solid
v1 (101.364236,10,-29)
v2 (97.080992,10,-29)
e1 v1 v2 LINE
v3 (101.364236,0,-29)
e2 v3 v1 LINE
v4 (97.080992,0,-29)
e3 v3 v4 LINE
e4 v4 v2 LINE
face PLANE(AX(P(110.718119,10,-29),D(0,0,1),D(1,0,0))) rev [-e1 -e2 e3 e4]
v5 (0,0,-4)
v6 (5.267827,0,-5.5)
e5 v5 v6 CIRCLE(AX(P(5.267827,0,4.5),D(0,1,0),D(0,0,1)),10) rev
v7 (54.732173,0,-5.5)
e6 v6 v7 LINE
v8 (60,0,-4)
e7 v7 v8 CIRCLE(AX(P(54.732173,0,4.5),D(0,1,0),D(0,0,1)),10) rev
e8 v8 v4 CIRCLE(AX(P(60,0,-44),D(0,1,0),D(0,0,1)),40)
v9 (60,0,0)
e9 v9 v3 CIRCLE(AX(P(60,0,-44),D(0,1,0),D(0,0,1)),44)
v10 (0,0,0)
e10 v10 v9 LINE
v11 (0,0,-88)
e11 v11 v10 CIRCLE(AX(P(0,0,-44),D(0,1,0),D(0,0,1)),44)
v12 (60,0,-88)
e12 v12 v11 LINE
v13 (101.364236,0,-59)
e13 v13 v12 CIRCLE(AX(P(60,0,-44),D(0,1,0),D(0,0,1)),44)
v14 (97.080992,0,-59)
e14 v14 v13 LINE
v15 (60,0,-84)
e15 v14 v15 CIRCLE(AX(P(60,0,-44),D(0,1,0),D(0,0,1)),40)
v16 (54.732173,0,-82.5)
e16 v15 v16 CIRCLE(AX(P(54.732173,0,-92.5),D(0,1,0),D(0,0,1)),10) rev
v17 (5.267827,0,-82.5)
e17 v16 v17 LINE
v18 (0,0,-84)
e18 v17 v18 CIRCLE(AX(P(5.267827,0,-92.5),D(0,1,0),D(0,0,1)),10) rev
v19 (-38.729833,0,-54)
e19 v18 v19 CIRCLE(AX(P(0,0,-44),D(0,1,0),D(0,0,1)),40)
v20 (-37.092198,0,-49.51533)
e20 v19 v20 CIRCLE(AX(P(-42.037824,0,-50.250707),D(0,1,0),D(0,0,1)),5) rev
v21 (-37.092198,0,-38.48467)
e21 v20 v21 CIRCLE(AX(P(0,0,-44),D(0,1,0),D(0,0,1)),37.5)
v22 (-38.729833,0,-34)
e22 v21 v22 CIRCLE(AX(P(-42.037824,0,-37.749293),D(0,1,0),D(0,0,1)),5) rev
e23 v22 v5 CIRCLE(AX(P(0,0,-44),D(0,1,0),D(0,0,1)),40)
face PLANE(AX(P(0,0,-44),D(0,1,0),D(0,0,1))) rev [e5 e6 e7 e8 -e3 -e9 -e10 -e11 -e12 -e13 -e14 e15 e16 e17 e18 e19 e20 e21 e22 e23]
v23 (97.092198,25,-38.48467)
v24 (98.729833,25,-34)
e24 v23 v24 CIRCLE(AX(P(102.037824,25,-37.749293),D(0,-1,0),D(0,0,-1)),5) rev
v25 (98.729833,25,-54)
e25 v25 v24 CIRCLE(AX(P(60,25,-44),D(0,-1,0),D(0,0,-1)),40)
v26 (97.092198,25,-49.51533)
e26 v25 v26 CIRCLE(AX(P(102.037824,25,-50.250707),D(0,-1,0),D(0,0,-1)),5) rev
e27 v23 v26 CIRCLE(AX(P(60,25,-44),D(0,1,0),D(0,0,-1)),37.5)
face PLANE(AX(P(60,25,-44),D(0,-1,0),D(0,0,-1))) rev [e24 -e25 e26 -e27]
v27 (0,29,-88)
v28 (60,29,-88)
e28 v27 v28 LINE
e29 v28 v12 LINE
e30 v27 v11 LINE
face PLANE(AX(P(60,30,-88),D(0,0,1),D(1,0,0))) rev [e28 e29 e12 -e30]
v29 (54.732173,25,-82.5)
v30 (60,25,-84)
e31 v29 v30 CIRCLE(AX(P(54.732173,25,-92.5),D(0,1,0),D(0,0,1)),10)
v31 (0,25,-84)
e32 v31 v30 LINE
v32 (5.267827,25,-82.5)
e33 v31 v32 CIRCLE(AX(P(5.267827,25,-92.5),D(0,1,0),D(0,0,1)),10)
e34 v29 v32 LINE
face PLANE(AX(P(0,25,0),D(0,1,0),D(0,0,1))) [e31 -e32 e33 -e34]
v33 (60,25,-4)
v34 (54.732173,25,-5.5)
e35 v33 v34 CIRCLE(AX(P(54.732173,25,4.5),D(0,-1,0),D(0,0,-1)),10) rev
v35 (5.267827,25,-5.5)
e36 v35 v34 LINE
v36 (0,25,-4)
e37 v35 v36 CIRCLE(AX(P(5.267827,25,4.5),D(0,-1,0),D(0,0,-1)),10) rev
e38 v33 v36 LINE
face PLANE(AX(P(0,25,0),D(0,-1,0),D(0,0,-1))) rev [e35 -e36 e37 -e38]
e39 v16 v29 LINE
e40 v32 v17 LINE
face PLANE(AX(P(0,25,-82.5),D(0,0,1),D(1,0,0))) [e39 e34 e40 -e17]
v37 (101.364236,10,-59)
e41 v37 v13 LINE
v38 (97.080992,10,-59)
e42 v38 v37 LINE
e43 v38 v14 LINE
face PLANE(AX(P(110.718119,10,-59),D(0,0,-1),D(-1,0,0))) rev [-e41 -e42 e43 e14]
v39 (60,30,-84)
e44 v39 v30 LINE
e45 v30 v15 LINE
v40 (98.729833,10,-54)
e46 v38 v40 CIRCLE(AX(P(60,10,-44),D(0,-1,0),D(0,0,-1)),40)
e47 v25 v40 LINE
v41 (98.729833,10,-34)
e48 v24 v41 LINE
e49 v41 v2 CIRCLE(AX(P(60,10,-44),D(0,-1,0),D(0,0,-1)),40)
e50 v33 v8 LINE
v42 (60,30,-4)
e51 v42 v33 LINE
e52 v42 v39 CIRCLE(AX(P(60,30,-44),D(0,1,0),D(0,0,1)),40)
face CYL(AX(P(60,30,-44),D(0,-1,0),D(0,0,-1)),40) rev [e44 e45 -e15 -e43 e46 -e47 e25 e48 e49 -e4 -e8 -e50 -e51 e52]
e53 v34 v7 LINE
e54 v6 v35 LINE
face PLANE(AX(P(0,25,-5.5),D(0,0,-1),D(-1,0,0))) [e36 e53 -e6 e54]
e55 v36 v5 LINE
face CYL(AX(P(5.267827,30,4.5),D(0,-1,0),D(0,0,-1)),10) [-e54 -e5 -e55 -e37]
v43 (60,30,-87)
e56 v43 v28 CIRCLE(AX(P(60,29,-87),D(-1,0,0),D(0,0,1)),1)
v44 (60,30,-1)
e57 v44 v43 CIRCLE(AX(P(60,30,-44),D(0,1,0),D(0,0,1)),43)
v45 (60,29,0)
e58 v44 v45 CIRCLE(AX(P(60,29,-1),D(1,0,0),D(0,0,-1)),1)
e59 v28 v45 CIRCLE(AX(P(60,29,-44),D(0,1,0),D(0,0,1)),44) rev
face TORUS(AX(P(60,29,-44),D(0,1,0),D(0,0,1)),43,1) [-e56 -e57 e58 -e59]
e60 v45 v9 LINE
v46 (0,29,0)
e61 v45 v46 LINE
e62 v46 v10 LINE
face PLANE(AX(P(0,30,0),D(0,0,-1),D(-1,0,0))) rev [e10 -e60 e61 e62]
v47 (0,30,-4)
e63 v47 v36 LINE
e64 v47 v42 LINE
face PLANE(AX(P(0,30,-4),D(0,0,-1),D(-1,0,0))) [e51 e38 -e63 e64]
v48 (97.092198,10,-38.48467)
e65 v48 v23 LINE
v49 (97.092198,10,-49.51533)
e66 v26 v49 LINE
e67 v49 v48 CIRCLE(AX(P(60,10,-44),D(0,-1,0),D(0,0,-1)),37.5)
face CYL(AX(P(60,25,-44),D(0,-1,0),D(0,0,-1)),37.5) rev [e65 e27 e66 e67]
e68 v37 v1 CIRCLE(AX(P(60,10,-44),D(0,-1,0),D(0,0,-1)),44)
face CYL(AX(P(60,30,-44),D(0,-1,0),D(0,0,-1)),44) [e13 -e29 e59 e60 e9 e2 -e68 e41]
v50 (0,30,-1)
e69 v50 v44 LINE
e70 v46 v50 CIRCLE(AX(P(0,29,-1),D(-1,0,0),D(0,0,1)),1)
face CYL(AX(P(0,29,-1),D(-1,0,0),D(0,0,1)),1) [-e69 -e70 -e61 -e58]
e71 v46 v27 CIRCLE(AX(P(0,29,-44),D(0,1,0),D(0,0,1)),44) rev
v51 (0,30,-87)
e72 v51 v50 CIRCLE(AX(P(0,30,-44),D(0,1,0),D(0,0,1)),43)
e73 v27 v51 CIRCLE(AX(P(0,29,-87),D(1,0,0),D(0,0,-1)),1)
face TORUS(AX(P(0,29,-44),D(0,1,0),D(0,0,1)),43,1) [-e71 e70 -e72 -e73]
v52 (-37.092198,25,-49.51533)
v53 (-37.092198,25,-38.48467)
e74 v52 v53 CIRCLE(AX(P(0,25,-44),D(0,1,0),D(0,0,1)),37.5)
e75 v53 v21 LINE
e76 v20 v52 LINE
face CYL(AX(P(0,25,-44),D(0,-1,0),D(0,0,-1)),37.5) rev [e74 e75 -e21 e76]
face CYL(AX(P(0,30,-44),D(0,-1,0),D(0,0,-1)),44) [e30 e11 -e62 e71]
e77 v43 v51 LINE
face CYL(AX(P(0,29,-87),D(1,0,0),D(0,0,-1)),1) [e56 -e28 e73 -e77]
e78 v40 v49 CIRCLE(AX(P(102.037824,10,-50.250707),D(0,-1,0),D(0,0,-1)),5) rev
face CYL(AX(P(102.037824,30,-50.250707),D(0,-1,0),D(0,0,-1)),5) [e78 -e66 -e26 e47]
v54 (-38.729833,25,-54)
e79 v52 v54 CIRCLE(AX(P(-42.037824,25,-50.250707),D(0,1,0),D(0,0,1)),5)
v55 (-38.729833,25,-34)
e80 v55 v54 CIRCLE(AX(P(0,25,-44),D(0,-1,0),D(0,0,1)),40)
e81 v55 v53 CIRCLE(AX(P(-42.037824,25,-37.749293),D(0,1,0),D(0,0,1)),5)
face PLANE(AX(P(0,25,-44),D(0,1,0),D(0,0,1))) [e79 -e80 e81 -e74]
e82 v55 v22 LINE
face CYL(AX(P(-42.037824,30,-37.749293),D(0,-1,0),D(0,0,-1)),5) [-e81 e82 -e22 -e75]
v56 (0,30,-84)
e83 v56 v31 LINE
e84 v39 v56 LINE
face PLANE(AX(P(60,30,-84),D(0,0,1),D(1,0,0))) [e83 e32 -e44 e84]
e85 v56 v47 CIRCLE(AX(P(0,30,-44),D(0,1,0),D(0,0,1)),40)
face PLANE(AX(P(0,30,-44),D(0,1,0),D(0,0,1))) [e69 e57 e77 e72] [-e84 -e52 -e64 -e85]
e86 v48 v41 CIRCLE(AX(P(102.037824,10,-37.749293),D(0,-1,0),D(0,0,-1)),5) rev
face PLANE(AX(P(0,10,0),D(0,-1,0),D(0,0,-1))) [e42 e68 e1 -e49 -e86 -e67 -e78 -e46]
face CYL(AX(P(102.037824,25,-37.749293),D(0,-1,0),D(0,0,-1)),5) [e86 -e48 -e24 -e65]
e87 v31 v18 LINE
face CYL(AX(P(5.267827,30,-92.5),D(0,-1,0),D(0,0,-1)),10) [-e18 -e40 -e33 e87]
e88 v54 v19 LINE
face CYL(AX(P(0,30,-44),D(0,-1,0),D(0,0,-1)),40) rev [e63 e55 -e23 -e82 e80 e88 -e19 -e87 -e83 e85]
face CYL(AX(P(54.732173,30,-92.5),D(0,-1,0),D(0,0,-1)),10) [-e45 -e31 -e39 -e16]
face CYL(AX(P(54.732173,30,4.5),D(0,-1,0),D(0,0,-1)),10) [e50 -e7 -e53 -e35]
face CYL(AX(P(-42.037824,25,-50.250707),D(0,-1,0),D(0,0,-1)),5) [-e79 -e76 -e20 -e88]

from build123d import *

# Parameters (mm, degrees)
BOSS_EXTRUDE1_DEPTH = 30
SHELL1_T            = -4
SKETCH3_W           = 60
SKETCH3_H           = 1.5
BOSS_EXTRUDE2_DEPTH = 25
BOSS_EXTRUDE3_DEPTH = 25
FILLET2_R           = 10
BOSS_EXTRUDE5_DEPTH = 25
FILLET5_R           = 5
FILLET6_R           = 1
SKETCH9_W           = 17
SKETCH9_H           = 30
CUT_EXTRUDE1_DEPTH  = 10


with BuildPart() as part:
    # Sketch1 → Boss-Extrude1 (new body)
    with BuildSketch(Plane(origin=(0, 0, 0), x_dir=(1, 0, 0), z_dir=(0, 1, 0))):
        with BuildLine():
            Line((0, 0), (60, 0))
            ThreePointArc((60, 0), (104, 44), (60, 88))
            Line((60, 88), (0, 88))
            ThreePointArc((0, 88), (-44, 44), (0, 0))
        make_face()
    extrude(amount=BOSS_EXTRUDE1_DEPTH)

    # Shell1
    shell1_openings = [part.faces().sort_by_distance(p)[0] for p in [
        (30, 30, -44),
        (30, 0, -44),
    ]]
    offset(amount=SHELL1_T, openings=shell1_openings, kind=Kind.INTERSECTION)

    # Sketch3 → Boss-Extrude2 (add)
    with BuildSketch(Plane.XZ):
        with Locations((30, -4.75)):
            Rectangle(SKETCH3_W, SKETCH3_H)
    extrude(amount=-BOSS_EXTRUDE2_DEPTH)

    # Sketch5 → Boss-Extrude3 (add)
    with BuildSketch(Plane.XZ):
        Polygon((0, -84), (0, -82.5), (60.003782522, -82.5), (60, -84), align=None)
    extrude(amount=-BOSS_EXTRUDE3_DEPTH)

    # Fillet2
    # the kernel refuses this fillet: 10 mm, written as the material it takes off along each edge
    with BuildSketch(Plane(origin=(60, -13.169567191, -5.5), x_dir=(0, 0, 1), z_dir=(0, 1, 0)), Plane(origin=(0, -13.169567191, -82.5), x_dir=(0, 0, -1), z_dir=(0, 1, 0))) as fillet2_piece_1:
        with BuildLine():
            CenterArc((10, -5.267826876), FILLET2_R, 148.211669383, 31.788330617)
            Line((0, -5.267826876), (-0.2, -5.267826876))
            Line((-0.2, -5.267826876), (-0.2, 0))
            Line((-0.2, 0), (0, 0.2))
            ThreePointArc((0, 0.2), (0.75, 0.2), (1.33, 0.105356538))
            Line((1.33, 0.105356538), (1.5, 0))
        make_face()
    extrude(amount=51.339134382, mode=Mode.SUBTRACT)
    with BuildSketch(Plane(origin=(60.003782522, -13.179023495, -82.5), x_dir=(-1, 0, 0), z_dir=(0, 1, 0))) as fillet2_piece_2:
        with BuildLine():
            CenterArc((5.271609398, -10), FILLET2_R, 90, 31.788330617)
            Line((0.003782522, -1.5), (-0.101574016, -1.33))
            ThreePointArc((-0.101574016, -1.33), (-0.198108103, -0.750504335), (-0.199999364, -0.000504335))
            Line((-0.199999364, -0.000504335), (0, 0.2))
            Line((0, 0.2), (5.271609398, 0.2))
            Line((5.271609398, 0.2), (5.271609398, 0))
        make_face()
    extrude(amount=51.358046991, mode=Mode.SUBTRACT)
    with BuildSketch(Plane(origin=(0, -13.169567191, -5.5), x_dir=(1, 0, 0), z_dir=(0, 1, 0))) as fillet2_piece_3:
        with BuildLine():
            CenterArc((5.267826876, -10), FILLET2_R, 90, 31.788330617)
            Line((0, -1.5), (-0.105356538, -1.33))
            ThreePointArc((-0.105356538, -1.33), (-0.2, -0.75), (-0.2, 0))
            Line((-0.2, 0), (0, 0.2))
            Line((0, 0.2), (5.267826876, 0.2))
            Line((5.267826876, 0.2), (5.267826876, 0))
        make_face()
    extrude(amount=51.339134382, mode=Mode.SUBTRACT)

    # Sketch8 → Boss-Extrude5 (add)
    with BuildSketch(Plane.XZ):
        with BuildLine():
            Line((96.142080737, -34), (98.729833462, -34))
            ThreePointArc((98.729833462, -34), (100, -44), (98.729833462, -54))
            Line((98.729833462, -54), (96.142080737, -54))
            ThreePointArc((96.142080737, -54), (97.5, -44), (96.142080737, -34))
        make_face()
        with BuildLine():
            Line((-36.142080737, -54), (-38.729833462, -54))
            ThreePointArc((-38.729833462, -54), (-40, -44), (-38.729833462, -34))
            Line((-38.729833462, -34), (-36.142080737, -34))
            ThreePointArc((-36.142080737, -34), (-37.5, -44), (-36.142080737, -54))
        make_face()
    extrude(amount=-BOSS_EXTRUDE5_DEPTH)

    # Fillet5
    # the kernel refuses this fillet: 5 mm, written as the material it takes off along each edge
    with BuildSketch(Plane(origin=(96.142080737, -11.460527233, -34), x_dir=(1, 0, 0), z_dir=(0, 1, 0)), Plane(origin=(-36.142080737, -11.460527233, -54), x_dir=(-1, 0, 0), z_dir=(0, 1, 0))) as fillet5_piece_1:
        with BuildLine():
            CenterArc((5.895743435, 3.749292929), FILLET5_R, 171.542516957, 57.035612676)
            Line((0.950117062, 4.484670231), (0.851204534, 4.499377777))
            ThreePointArc((0.851204534, 4.499377777), (0.445822951, 2.248528932), (-0.096378882, 0.026666667))
            Line((-0.096378882, 0.026666667), (0, -0.1))
            ThreePointArc((0, -0.1), (1.293876363, -0.1), (2.521592911, -0.074985859))
            Line((2.521592911, -0.074985859), (2.587752725, 0))
        make_face()
    extrude(amount=47.921054465, mode=Mode.SUBTRACT)
    with BuildSketch(Plane(origin=(96.142080737, -11.460527233, -54), x_dir=(1, 0, 0), z_dir=(0, 1, 0)), Plane(origin=(-36.142080737, -11.460527233, -34), x_dir=(-1, 0, 0), z_dir=(0, 1, 0))) as fillet5_piece_2:
        with BuildLine():
            CenterArc((5.895743435, -3.749292929), FILLET5_R, 131.421870366, 57.035612676)
            Line((0.950117062, -4.484670231), (0.851204534, -4.499377777))
            ThreePointArc((0.851204534, -4.499377777), (0.445822951, -2.248528932), (-0.096378882, -0.026666667))
            Line((-0.096378882, -0.026666667), (0, 0.1))
            ThreePointArc((0, 0.1), (1.293876363, 0.1), (2.521592911, 0.074985859))
            Line((2.521592911, 0.074985859), (2.587752725, 0))
        make_face()
    extrude(amount=47.921054465, mode=Mode.SUBTRACT)

    # Fillet6
    fillet6_edges = [part.edges().sort_by_distance(p)[0] for p in [
        (104, 30, -44),
        (30, 30, -88),
        (-44, 30, -44),
        (30, 30, 0),
    ]]
    fillet(fillet6_edges, radius=FILLET6_R)

    # Sketch9 → Cut-Extrude1 (cut)
    with BuildSketch(Plane.XZ):
        with Locations((102.218118592, -44)):
            Rectangle(SKETCH9_W, SKETCH9_H)
    extrude(amount=-CUT_EXTRUDE1_DEPTH, mode=Mode.SUBTRACT)


solid = part.part
